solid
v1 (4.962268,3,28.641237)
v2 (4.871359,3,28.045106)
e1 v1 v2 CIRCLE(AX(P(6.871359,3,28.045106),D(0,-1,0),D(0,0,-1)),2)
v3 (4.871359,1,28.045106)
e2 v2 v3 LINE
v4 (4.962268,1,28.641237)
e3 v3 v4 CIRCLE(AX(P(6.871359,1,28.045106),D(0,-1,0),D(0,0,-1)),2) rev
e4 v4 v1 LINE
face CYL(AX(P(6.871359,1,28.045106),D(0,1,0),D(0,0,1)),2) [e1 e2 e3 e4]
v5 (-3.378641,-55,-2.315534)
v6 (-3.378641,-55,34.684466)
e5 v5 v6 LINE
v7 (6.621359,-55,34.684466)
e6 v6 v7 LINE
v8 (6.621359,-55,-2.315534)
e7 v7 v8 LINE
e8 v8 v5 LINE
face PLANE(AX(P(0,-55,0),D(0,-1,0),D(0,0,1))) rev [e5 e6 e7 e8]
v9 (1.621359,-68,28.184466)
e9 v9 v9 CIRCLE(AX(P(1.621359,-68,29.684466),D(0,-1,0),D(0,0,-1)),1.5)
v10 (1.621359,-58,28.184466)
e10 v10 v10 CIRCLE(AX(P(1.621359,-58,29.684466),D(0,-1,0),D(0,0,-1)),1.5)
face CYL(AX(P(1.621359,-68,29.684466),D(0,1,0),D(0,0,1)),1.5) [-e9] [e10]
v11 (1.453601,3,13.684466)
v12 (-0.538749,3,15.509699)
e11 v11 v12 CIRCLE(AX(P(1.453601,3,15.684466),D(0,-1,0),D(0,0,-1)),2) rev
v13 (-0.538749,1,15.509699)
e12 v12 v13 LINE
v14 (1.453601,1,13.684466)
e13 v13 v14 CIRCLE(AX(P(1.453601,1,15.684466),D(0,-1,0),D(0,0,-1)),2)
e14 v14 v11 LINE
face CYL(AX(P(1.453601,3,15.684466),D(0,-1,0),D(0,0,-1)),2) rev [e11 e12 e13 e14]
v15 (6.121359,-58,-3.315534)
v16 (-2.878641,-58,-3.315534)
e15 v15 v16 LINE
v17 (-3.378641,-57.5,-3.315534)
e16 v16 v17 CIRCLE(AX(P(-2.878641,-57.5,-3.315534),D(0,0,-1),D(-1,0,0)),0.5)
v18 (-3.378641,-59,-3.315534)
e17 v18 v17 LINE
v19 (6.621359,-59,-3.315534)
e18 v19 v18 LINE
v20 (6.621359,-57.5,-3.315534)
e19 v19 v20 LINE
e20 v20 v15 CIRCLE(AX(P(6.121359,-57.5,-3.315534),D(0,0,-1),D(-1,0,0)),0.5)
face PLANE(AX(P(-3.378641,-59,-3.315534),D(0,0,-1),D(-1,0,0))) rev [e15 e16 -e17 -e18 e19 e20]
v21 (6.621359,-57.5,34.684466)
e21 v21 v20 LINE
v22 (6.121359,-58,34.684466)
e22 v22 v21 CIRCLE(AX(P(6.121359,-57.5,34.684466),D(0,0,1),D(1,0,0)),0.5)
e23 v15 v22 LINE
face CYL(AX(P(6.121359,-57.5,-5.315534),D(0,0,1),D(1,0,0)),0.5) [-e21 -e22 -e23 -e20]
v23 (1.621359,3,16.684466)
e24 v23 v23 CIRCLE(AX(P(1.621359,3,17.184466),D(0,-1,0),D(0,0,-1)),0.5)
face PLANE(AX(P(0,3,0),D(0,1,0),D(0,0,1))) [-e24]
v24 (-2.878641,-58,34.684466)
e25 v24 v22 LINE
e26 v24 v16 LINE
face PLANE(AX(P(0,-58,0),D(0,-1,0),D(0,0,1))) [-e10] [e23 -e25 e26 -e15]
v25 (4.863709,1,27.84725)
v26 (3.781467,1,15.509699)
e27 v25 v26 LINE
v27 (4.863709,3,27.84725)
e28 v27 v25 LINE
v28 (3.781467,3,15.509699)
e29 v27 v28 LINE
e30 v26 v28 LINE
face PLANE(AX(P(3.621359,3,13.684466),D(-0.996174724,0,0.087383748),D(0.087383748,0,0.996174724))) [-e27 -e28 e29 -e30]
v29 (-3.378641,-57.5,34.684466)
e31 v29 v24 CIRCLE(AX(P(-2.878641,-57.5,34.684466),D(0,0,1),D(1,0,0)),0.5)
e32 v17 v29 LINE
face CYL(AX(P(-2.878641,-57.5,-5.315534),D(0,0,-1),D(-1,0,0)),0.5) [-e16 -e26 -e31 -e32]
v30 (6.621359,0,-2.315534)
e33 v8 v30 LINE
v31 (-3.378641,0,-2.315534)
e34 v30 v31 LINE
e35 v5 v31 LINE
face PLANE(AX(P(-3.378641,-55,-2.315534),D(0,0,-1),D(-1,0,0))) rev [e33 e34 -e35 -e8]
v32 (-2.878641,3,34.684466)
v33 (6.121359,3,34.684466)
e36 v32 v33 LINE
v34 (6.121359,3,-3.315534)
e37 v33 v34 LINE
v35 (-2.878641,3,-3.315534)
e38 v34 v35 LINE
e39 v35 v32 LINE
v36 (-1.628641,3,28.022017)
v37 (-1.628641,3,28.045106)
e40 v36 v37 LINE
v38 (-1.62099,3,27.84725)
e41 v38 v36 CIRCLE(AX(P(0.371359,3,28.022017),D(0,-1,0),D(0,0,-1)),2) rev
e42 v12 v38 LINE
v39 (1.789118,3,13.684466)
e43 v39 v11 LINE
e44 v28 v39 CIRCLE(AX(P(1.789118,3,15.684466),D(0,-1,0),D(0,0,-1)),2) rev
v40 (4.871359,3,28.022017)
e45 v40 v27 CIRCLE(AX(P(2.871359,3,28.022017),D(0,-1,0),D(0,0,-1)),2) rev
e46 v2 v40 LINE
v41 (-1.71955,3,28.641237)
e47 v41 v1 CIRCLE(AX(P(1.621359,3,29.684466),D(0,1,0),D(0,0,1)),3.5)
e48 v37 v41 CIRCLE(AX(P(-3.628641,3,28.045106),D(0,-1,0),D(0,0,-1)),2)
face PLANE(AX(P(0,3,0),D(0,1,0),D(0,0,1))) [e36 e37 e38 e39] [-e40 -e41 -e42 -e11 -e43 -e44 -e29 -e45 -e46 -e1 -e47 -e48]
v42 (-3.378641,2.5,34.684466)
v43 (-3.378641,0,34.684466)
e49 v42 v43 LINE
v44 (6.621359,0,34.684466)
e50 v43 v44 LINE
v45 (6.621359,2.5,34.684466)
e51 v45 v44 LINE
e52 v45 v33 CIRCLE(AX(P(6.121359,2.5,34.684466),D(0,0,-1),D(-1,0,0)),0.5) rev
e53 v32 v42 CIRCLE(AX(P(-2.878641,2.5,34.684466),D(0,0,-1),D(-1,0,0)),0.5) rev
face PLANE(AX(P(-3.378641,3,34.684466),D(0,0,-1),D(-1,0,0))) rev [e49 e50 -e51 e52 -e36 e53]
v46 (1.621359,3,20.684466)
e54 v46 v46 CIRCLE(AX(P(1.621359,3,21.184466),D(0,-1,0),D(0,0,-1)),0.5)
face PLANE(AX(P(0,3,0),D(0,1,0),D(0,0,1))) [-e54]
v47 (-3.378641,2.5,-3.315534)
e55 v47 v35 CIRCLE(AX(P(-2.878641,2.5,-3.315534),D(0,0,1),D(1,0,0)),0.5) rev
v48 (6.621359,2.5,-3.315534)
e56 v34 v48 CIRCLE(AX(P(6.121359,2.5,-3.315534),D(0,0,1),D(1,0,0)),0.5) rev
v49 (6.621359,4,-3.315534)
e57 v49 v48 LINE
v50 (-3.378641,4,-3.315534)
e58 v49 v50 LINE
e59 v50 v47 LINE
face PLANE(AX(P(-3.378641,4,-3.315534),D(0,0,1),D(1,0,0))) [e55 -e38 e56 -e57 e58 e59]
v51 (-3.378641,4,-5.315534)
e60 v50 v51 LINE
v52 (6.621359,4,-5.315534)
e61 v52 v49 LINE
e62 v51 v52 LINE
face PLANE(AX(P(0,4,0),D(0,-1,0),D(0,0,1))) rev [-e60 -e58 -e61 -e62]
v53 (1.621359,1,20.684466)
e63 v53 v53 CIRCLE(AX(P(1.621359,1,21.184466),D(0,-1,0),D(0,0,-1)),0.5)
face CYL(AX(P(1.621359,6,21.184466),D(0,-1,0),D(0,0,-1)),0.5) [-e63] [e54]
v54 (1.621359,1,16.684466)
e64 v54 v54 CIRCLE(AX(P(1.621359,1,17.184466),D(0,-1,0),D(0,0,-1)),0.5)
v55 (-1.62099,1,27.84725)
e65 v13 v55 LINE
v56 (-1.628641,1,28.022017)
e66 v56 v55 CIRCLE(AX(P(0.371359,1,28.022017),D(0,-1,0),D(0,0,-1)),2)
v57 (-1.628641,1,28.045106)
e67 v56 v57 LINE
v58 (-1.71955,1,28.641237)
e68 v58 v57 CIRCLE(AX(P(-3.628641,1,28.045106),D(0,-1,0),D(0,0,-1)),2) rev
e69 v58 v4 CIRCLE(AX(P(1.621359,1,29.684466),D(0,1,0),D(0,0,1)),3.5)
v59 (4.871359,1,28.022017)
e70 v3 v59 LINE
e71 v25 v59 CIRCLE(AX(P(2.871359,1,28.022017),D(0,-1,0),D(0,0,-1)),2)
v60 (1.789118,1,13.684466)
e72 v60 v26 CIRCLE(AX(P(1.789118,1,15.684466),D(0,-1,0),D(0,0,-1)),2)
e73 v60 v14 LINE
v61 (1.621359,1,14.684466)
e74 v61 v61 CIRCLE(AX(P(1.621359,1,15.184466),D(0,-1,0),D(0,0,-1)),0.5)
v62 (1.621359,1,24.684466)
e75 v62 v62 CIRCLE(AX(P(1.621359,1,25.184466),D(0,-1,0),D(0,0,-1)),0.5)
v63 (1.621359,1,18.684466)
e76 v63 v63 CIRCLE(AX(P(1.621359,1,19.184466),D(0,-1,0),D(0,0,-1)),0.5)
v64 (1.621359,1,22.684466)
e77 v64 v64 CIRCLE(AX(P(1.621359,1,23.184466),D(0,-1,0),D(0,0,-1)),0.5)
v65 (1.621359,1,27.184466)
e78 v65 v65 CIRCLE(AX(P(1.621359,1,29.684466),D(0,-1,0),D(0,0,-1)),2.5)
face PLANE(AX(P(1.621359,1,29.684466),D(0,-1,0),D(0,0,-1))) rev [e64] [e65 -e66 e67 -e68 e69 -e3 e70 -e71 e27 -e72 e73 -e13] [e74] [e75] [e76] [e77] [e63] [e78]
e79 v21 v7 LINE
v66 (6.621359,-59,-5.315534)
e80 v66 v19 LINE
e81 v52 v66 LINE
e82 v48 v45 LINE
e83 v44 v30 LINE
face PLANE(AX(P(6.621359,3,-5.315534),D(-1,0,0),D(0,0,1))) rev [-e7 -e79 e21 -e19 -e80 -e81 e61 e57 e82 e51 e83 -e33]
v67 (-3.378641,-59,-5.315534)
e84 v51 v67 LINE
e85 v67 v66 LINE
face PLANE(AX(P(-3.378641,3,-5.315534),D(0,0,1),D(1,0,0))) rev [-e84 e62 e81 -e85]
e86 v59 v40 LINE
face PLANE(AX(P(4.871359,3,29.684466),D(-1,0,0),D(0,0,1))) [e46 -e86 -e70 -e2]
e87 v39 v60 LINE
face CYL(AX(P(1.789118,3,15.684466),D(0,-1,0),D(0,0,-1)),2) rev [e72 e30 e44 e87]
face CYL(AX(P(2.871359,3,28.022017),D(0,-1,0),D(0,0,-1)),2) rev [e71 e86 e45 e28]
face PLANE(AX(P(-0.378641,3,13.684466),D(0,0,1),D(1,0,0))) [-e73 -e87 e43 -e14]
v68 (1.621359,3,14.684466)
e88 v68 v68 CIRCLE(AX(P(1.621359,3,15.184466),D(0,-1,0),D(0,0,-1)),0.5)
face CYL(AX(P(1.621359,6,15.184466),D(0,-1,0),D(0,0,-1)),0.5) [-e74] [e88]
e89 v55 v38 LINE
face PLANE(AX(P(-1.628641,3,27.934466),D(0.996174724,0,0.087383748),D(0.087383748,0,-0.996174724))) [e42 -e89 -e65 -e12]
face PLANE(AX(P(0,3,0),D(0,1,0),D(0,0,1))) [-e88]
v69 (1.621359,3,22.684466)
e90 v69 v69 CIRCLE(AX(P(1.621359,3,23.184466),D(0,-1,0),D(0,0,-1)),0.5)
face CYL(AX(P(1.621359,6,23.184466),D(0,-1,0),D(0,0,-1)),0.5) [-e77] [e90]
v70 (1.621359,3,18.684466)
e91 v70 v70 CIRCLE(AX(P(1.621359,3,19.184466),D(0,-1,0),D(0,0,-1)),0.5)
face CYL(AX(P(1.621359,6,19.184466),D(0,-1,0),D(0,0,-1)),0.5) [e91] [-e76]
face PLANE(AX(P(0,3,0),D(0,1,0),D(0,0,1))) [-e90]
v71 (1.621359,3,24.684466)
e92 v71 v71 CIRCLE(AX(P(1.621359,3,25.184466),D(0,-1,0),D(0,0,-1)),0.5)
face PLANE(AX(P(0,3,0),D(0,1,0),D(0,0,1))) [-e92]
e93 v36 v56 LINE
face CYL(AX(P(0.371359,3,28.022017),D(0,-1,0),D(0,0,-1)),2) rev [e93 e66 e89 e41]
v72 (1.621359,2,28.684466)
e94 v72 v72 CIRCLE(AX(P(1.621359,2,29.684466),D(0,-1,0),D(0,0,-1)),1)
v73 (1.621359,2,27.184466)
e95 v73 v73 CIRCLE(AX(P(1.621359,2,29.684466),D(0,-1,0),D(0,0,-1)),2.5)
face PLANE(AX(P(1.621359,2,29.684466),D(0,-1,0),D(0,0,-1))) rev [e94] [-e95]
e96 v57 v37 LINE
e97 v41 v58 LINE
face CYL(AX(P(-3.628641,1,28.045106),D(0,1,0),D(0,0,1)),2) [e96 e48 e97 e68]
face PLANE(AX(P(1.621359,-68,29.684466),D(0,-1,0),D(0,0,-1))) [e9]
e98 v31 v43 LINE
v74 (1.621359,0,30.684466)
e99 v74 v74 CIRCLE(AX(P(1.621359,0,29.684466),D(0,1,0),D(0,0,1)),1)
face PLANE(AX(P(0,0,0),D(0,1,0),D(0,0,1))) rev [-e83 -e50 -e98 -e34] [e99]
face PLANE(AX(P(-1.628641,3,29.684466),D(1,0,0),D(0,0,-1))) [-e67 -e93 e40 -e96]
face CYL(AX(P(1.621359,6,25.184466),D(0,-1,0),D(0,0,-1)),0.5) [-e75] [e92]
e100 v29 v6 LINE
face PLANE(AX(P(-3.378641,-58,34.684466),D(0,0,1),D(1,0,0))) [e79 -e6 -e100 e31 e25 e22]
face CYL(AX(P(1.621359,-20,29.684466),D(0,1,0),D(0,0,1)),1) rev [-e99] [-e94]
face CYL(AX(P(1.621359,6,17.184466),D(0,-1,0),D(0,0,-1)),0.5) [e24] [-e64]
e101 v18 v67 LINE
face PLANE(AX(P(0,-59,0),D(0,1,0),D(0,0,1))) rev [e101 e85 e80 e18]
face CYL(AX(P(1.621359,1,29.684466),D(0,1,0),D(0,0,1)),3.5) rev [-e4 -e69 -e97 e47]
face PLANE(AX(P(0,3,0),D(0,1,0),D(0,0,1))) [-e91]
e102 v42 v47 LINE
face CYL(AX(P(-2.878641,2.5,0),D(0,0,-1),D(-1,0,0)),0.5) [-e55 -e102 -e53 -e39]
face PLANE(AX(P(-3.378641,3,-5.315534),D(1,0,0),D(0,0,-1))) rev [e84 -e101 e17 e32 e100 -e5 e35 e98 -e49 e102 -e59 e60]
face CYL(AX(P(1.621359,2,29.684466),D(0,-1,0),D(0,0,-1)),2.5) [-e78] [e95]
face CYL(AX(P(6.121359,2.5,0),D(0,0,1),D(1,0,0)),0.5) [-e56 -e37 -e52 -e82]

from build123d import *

# Parameters (mm, degrees)
SKETCH1_W             = 10
SKETCH1_H             = 40
BOSS_EXTRUDE1_DEPTH   = 3
CAVITY4_START         = 1
CAVITY4_OUTLINE_R     = 2.5
CAVITY4_OUTLINE_R_2   = 0.5
CAVITY4_DEPTH         = 2
CAVITY4_START_2       = 2
CAVITY4_2_OUTLINE_R   = 2.5
CAVITY4_2_OUTLINE_R_2 = 1
CAVITY4_2_DEPTH       = 1
CUT_EXTRUDE4_START    = -23
SKETCH5_R             = 1
CUT_EXTRUDE4_DEPTH    = 23
SKETCH7_W             = 10
SKETCH7_H             = 3
BOSS_EXTRUDE3_DEPTH   = 55
SKETCH8_R             = 1.5
BOSS_EXTRUDE4_DEPTH   = 10
SKETCH9_W             = 10
SKETCH9_H             = 2
BOSS_EXTRUDE5_DEPTH   = 1
FILLET2_R             = 0.5
FILLET3_R             = 0.5


# Read off the part's stored shape, not the designer's step: Cavity4
with BuildPart() as part:
    # Sketch1 → Boss-Extrude1 (new body)
    with BuildSketch(Plane(origin=(0, 0, 0), x_dir=(1, 0, 0), z_dir=(0, 1, 0))):
        with Locations((1.621359223, -14.684466019)):
            Rectangle(SKETCH1_W, SKETCH1_H)
    boss_extrude1 = extrude(amount=BOSS_EXTRUDE1_DEPTH)

    # Cavity4 outline → Cavity4 (cut)
    with BuildSketch(Plane(origin=(0, 0, 0), x_dir=(1, 0, 0), z_dir=(0, 1, 0)).offset(CAVITY4_START)):
        with BuildLine():
            Line((-0.538748891, -15.509698524), (-1.620990225, -27.847249725))
            ThreePointArc((-1.620990225, -27.847249725), (-1.626727223, -27.934549786), (-1.628640777, -28.022017221))
            Line((-1.628640777, -28.022017221), (-1.628640777, -28.045106388))
            ThreePointArc((-1.628640777, -28.045106388), (-1.65149867, -28.346617733), (-1.719549868, -28.641237163))
            ThreePointArc((-1.719549868, -28.641237163), (1.621359223, -33.184466019), (4.962268314, -28.641237163))
            ThreePointArc((4.962268314, -28.641237163), (4.894217117, -28.346617733), (4.871359223, -28.045106388))
            Line((4.871359223, -28.045106388), (4.871359223, -28.022017221))
            ThreePointArc((4.871359223, -28.022017221), (4.86944567, -27.934549786), (4.863708671, -27.847249725))
            Line((4.863708671, -27.847249725), (3.781467338, -15.509698524))
            ThreePointArc((3.781467338, -15.509698524), (3.14012955, -14.209756728), (1.78911789, -13.684466019))
            Line((1.78911789, -13.684466019), (1.453600557, -13.684466019))
            ThreePointArc((1.453600557, -13.684466019), (0.102588897, -14.209756728), (-0.538748891, -15.509698524))
        make_face()
        with Locations((1.621359223, -29.684466019)):
            Circle(CAVITY4_OUTLINE_R, mode=Mode.SUBTRACT)
        with Locations((1.621359223, -25.184466019)):
            Circle(CAVITY4_OUTLINE_R_2, mode=Mode.SUBTRACT)
        with Locations((1.621359223, -23.184466019)):
            Circle(CAVITY4_OUTLINE_R_2, mode=Mode.SUBTRACT)
        with Locations((1.621359223, -21.184466019)):
            Circle(CAVITY4_OUTLINE_R_2, mode=Mode.SUBTRACT)
        with Locations((1.621359223, -19.184466019)):
            Circle(CAVITY4_OUTLINE_R_2, mode=Mode.SUBTRACT)
        with Locations((1.621359223, -17.184466019)):
            Circle(CAVITY4_OUTLINE_R_2, mode=Mode.SUBTRACT)
        with Locations((1.621359223, -15.184466019)):
            Circle(CAVITY4_OUTLINE_R_2, mode=Mode.SUBTRACT)
    extrude(amount=CAVITY4_DEPTH, mode=Mode.SUBTRACT)

    # Cavity4 2 outline → Cavity4 2 (cut)
    with BuildSketch(Plane(origin=(0, 0, 0), x_dir=(1, 0, 0), z_dir=(0, 1, 0)).offset(CAVITY4_START_2)):
        with Locations((1.621359223, -29.684466019)):
            Circle(CAVITY4_2_OUTLINE_R)
        with Locations((1.621359223, -29.684466019)):
            Circle(CAVITY4_2_OUTLINE_R_2, mode=Mode.SUBTRACT)
    extrude(amount=CAVITY4_2_DEPTH, mode=Mode.SUBTRACT)

    # Sketch5 → Cut-Extrude4 (cut)
    with BuildSketch(Plane(origin=(0, 3, 0), x_dir=(1, 0, 0), z_dir=(0, 1, 0)).offset(CUT_EXTRUDE4_START)):
        with Locations(Location((1.621359223, -29.684466019, 0), (0, 0, 270))):
            Circle(SKETCH5_R)
    extrude(amount=CUT_EXTRUDE4_DEPTH, mode=Mode.SUBTRACT)

    # Sketch7 → Boss-Extrude3 (add)
    with BuildSketch(Plane.XZ):
        with Locations((1.621359223, -3.815533981)):
            Rectangle(SKETCH7_W, SKETCH7_H)
    extrude(amount=BOSS_EXTRUDE3_DEPTH)

    # Mirror1: Boss-Extrude1 across plane
    add(boss_extrude1.mirror(Plane(origin=(0, -27.5, 0), x_dir=(0, 0, 1), z_dir=(0, -1, 0))))

    # Sketch8 → Boss-Extrude4 (add)
    with BuildSketch(Plane.XZ.offset(58)):
        with Locations(Location((1.621359223, 29.684466019, 0), (0, 0, 270))):
            Circle(SKETCH8_R)
    extrude(amount=BOSS_EXTRUDE4_DEPTH)

    # Sketch9 → Boss-Extrude5 (add)
    with BuildSketch(Plane.XZ.offset(58)):
        with Locations((1.621359223, -4.315533981)):
            Rectangle(SKETCH9_W, SKETCH9_H)
    boss_extrude5 = extrude(amount=BOSS_EXTRUDE5_DEPTH)

    # Mirror2: Boss-Extrude5 across plane
    add(boss_extrude5.mirror(Plane(origin=(0, -27.5, 0), x_dir=(0, 0, 1), z_dir=(0, -1, 0))))

    # Fillet2
    fillet2_edges = [part.edges().sort_by_distance(p)[0] for p in [
        (6.621359223, 3, 15.684466019),
        (6.621359223, -58, 15.684466019),
    ]]
    fillet(fillet2_edges, radius=FILLET2_R)

    # Fillet3
    fillet3_edges = [part.edges().sort_by_distance(p)[0] for p in [
        (-3.378640777, -58, 15.684466019),
        (-3.378640777, 3, 15.684466019),
    ]]
    fillet(fillet3_edges, radius=FILLET3_R)


solid = part.part
